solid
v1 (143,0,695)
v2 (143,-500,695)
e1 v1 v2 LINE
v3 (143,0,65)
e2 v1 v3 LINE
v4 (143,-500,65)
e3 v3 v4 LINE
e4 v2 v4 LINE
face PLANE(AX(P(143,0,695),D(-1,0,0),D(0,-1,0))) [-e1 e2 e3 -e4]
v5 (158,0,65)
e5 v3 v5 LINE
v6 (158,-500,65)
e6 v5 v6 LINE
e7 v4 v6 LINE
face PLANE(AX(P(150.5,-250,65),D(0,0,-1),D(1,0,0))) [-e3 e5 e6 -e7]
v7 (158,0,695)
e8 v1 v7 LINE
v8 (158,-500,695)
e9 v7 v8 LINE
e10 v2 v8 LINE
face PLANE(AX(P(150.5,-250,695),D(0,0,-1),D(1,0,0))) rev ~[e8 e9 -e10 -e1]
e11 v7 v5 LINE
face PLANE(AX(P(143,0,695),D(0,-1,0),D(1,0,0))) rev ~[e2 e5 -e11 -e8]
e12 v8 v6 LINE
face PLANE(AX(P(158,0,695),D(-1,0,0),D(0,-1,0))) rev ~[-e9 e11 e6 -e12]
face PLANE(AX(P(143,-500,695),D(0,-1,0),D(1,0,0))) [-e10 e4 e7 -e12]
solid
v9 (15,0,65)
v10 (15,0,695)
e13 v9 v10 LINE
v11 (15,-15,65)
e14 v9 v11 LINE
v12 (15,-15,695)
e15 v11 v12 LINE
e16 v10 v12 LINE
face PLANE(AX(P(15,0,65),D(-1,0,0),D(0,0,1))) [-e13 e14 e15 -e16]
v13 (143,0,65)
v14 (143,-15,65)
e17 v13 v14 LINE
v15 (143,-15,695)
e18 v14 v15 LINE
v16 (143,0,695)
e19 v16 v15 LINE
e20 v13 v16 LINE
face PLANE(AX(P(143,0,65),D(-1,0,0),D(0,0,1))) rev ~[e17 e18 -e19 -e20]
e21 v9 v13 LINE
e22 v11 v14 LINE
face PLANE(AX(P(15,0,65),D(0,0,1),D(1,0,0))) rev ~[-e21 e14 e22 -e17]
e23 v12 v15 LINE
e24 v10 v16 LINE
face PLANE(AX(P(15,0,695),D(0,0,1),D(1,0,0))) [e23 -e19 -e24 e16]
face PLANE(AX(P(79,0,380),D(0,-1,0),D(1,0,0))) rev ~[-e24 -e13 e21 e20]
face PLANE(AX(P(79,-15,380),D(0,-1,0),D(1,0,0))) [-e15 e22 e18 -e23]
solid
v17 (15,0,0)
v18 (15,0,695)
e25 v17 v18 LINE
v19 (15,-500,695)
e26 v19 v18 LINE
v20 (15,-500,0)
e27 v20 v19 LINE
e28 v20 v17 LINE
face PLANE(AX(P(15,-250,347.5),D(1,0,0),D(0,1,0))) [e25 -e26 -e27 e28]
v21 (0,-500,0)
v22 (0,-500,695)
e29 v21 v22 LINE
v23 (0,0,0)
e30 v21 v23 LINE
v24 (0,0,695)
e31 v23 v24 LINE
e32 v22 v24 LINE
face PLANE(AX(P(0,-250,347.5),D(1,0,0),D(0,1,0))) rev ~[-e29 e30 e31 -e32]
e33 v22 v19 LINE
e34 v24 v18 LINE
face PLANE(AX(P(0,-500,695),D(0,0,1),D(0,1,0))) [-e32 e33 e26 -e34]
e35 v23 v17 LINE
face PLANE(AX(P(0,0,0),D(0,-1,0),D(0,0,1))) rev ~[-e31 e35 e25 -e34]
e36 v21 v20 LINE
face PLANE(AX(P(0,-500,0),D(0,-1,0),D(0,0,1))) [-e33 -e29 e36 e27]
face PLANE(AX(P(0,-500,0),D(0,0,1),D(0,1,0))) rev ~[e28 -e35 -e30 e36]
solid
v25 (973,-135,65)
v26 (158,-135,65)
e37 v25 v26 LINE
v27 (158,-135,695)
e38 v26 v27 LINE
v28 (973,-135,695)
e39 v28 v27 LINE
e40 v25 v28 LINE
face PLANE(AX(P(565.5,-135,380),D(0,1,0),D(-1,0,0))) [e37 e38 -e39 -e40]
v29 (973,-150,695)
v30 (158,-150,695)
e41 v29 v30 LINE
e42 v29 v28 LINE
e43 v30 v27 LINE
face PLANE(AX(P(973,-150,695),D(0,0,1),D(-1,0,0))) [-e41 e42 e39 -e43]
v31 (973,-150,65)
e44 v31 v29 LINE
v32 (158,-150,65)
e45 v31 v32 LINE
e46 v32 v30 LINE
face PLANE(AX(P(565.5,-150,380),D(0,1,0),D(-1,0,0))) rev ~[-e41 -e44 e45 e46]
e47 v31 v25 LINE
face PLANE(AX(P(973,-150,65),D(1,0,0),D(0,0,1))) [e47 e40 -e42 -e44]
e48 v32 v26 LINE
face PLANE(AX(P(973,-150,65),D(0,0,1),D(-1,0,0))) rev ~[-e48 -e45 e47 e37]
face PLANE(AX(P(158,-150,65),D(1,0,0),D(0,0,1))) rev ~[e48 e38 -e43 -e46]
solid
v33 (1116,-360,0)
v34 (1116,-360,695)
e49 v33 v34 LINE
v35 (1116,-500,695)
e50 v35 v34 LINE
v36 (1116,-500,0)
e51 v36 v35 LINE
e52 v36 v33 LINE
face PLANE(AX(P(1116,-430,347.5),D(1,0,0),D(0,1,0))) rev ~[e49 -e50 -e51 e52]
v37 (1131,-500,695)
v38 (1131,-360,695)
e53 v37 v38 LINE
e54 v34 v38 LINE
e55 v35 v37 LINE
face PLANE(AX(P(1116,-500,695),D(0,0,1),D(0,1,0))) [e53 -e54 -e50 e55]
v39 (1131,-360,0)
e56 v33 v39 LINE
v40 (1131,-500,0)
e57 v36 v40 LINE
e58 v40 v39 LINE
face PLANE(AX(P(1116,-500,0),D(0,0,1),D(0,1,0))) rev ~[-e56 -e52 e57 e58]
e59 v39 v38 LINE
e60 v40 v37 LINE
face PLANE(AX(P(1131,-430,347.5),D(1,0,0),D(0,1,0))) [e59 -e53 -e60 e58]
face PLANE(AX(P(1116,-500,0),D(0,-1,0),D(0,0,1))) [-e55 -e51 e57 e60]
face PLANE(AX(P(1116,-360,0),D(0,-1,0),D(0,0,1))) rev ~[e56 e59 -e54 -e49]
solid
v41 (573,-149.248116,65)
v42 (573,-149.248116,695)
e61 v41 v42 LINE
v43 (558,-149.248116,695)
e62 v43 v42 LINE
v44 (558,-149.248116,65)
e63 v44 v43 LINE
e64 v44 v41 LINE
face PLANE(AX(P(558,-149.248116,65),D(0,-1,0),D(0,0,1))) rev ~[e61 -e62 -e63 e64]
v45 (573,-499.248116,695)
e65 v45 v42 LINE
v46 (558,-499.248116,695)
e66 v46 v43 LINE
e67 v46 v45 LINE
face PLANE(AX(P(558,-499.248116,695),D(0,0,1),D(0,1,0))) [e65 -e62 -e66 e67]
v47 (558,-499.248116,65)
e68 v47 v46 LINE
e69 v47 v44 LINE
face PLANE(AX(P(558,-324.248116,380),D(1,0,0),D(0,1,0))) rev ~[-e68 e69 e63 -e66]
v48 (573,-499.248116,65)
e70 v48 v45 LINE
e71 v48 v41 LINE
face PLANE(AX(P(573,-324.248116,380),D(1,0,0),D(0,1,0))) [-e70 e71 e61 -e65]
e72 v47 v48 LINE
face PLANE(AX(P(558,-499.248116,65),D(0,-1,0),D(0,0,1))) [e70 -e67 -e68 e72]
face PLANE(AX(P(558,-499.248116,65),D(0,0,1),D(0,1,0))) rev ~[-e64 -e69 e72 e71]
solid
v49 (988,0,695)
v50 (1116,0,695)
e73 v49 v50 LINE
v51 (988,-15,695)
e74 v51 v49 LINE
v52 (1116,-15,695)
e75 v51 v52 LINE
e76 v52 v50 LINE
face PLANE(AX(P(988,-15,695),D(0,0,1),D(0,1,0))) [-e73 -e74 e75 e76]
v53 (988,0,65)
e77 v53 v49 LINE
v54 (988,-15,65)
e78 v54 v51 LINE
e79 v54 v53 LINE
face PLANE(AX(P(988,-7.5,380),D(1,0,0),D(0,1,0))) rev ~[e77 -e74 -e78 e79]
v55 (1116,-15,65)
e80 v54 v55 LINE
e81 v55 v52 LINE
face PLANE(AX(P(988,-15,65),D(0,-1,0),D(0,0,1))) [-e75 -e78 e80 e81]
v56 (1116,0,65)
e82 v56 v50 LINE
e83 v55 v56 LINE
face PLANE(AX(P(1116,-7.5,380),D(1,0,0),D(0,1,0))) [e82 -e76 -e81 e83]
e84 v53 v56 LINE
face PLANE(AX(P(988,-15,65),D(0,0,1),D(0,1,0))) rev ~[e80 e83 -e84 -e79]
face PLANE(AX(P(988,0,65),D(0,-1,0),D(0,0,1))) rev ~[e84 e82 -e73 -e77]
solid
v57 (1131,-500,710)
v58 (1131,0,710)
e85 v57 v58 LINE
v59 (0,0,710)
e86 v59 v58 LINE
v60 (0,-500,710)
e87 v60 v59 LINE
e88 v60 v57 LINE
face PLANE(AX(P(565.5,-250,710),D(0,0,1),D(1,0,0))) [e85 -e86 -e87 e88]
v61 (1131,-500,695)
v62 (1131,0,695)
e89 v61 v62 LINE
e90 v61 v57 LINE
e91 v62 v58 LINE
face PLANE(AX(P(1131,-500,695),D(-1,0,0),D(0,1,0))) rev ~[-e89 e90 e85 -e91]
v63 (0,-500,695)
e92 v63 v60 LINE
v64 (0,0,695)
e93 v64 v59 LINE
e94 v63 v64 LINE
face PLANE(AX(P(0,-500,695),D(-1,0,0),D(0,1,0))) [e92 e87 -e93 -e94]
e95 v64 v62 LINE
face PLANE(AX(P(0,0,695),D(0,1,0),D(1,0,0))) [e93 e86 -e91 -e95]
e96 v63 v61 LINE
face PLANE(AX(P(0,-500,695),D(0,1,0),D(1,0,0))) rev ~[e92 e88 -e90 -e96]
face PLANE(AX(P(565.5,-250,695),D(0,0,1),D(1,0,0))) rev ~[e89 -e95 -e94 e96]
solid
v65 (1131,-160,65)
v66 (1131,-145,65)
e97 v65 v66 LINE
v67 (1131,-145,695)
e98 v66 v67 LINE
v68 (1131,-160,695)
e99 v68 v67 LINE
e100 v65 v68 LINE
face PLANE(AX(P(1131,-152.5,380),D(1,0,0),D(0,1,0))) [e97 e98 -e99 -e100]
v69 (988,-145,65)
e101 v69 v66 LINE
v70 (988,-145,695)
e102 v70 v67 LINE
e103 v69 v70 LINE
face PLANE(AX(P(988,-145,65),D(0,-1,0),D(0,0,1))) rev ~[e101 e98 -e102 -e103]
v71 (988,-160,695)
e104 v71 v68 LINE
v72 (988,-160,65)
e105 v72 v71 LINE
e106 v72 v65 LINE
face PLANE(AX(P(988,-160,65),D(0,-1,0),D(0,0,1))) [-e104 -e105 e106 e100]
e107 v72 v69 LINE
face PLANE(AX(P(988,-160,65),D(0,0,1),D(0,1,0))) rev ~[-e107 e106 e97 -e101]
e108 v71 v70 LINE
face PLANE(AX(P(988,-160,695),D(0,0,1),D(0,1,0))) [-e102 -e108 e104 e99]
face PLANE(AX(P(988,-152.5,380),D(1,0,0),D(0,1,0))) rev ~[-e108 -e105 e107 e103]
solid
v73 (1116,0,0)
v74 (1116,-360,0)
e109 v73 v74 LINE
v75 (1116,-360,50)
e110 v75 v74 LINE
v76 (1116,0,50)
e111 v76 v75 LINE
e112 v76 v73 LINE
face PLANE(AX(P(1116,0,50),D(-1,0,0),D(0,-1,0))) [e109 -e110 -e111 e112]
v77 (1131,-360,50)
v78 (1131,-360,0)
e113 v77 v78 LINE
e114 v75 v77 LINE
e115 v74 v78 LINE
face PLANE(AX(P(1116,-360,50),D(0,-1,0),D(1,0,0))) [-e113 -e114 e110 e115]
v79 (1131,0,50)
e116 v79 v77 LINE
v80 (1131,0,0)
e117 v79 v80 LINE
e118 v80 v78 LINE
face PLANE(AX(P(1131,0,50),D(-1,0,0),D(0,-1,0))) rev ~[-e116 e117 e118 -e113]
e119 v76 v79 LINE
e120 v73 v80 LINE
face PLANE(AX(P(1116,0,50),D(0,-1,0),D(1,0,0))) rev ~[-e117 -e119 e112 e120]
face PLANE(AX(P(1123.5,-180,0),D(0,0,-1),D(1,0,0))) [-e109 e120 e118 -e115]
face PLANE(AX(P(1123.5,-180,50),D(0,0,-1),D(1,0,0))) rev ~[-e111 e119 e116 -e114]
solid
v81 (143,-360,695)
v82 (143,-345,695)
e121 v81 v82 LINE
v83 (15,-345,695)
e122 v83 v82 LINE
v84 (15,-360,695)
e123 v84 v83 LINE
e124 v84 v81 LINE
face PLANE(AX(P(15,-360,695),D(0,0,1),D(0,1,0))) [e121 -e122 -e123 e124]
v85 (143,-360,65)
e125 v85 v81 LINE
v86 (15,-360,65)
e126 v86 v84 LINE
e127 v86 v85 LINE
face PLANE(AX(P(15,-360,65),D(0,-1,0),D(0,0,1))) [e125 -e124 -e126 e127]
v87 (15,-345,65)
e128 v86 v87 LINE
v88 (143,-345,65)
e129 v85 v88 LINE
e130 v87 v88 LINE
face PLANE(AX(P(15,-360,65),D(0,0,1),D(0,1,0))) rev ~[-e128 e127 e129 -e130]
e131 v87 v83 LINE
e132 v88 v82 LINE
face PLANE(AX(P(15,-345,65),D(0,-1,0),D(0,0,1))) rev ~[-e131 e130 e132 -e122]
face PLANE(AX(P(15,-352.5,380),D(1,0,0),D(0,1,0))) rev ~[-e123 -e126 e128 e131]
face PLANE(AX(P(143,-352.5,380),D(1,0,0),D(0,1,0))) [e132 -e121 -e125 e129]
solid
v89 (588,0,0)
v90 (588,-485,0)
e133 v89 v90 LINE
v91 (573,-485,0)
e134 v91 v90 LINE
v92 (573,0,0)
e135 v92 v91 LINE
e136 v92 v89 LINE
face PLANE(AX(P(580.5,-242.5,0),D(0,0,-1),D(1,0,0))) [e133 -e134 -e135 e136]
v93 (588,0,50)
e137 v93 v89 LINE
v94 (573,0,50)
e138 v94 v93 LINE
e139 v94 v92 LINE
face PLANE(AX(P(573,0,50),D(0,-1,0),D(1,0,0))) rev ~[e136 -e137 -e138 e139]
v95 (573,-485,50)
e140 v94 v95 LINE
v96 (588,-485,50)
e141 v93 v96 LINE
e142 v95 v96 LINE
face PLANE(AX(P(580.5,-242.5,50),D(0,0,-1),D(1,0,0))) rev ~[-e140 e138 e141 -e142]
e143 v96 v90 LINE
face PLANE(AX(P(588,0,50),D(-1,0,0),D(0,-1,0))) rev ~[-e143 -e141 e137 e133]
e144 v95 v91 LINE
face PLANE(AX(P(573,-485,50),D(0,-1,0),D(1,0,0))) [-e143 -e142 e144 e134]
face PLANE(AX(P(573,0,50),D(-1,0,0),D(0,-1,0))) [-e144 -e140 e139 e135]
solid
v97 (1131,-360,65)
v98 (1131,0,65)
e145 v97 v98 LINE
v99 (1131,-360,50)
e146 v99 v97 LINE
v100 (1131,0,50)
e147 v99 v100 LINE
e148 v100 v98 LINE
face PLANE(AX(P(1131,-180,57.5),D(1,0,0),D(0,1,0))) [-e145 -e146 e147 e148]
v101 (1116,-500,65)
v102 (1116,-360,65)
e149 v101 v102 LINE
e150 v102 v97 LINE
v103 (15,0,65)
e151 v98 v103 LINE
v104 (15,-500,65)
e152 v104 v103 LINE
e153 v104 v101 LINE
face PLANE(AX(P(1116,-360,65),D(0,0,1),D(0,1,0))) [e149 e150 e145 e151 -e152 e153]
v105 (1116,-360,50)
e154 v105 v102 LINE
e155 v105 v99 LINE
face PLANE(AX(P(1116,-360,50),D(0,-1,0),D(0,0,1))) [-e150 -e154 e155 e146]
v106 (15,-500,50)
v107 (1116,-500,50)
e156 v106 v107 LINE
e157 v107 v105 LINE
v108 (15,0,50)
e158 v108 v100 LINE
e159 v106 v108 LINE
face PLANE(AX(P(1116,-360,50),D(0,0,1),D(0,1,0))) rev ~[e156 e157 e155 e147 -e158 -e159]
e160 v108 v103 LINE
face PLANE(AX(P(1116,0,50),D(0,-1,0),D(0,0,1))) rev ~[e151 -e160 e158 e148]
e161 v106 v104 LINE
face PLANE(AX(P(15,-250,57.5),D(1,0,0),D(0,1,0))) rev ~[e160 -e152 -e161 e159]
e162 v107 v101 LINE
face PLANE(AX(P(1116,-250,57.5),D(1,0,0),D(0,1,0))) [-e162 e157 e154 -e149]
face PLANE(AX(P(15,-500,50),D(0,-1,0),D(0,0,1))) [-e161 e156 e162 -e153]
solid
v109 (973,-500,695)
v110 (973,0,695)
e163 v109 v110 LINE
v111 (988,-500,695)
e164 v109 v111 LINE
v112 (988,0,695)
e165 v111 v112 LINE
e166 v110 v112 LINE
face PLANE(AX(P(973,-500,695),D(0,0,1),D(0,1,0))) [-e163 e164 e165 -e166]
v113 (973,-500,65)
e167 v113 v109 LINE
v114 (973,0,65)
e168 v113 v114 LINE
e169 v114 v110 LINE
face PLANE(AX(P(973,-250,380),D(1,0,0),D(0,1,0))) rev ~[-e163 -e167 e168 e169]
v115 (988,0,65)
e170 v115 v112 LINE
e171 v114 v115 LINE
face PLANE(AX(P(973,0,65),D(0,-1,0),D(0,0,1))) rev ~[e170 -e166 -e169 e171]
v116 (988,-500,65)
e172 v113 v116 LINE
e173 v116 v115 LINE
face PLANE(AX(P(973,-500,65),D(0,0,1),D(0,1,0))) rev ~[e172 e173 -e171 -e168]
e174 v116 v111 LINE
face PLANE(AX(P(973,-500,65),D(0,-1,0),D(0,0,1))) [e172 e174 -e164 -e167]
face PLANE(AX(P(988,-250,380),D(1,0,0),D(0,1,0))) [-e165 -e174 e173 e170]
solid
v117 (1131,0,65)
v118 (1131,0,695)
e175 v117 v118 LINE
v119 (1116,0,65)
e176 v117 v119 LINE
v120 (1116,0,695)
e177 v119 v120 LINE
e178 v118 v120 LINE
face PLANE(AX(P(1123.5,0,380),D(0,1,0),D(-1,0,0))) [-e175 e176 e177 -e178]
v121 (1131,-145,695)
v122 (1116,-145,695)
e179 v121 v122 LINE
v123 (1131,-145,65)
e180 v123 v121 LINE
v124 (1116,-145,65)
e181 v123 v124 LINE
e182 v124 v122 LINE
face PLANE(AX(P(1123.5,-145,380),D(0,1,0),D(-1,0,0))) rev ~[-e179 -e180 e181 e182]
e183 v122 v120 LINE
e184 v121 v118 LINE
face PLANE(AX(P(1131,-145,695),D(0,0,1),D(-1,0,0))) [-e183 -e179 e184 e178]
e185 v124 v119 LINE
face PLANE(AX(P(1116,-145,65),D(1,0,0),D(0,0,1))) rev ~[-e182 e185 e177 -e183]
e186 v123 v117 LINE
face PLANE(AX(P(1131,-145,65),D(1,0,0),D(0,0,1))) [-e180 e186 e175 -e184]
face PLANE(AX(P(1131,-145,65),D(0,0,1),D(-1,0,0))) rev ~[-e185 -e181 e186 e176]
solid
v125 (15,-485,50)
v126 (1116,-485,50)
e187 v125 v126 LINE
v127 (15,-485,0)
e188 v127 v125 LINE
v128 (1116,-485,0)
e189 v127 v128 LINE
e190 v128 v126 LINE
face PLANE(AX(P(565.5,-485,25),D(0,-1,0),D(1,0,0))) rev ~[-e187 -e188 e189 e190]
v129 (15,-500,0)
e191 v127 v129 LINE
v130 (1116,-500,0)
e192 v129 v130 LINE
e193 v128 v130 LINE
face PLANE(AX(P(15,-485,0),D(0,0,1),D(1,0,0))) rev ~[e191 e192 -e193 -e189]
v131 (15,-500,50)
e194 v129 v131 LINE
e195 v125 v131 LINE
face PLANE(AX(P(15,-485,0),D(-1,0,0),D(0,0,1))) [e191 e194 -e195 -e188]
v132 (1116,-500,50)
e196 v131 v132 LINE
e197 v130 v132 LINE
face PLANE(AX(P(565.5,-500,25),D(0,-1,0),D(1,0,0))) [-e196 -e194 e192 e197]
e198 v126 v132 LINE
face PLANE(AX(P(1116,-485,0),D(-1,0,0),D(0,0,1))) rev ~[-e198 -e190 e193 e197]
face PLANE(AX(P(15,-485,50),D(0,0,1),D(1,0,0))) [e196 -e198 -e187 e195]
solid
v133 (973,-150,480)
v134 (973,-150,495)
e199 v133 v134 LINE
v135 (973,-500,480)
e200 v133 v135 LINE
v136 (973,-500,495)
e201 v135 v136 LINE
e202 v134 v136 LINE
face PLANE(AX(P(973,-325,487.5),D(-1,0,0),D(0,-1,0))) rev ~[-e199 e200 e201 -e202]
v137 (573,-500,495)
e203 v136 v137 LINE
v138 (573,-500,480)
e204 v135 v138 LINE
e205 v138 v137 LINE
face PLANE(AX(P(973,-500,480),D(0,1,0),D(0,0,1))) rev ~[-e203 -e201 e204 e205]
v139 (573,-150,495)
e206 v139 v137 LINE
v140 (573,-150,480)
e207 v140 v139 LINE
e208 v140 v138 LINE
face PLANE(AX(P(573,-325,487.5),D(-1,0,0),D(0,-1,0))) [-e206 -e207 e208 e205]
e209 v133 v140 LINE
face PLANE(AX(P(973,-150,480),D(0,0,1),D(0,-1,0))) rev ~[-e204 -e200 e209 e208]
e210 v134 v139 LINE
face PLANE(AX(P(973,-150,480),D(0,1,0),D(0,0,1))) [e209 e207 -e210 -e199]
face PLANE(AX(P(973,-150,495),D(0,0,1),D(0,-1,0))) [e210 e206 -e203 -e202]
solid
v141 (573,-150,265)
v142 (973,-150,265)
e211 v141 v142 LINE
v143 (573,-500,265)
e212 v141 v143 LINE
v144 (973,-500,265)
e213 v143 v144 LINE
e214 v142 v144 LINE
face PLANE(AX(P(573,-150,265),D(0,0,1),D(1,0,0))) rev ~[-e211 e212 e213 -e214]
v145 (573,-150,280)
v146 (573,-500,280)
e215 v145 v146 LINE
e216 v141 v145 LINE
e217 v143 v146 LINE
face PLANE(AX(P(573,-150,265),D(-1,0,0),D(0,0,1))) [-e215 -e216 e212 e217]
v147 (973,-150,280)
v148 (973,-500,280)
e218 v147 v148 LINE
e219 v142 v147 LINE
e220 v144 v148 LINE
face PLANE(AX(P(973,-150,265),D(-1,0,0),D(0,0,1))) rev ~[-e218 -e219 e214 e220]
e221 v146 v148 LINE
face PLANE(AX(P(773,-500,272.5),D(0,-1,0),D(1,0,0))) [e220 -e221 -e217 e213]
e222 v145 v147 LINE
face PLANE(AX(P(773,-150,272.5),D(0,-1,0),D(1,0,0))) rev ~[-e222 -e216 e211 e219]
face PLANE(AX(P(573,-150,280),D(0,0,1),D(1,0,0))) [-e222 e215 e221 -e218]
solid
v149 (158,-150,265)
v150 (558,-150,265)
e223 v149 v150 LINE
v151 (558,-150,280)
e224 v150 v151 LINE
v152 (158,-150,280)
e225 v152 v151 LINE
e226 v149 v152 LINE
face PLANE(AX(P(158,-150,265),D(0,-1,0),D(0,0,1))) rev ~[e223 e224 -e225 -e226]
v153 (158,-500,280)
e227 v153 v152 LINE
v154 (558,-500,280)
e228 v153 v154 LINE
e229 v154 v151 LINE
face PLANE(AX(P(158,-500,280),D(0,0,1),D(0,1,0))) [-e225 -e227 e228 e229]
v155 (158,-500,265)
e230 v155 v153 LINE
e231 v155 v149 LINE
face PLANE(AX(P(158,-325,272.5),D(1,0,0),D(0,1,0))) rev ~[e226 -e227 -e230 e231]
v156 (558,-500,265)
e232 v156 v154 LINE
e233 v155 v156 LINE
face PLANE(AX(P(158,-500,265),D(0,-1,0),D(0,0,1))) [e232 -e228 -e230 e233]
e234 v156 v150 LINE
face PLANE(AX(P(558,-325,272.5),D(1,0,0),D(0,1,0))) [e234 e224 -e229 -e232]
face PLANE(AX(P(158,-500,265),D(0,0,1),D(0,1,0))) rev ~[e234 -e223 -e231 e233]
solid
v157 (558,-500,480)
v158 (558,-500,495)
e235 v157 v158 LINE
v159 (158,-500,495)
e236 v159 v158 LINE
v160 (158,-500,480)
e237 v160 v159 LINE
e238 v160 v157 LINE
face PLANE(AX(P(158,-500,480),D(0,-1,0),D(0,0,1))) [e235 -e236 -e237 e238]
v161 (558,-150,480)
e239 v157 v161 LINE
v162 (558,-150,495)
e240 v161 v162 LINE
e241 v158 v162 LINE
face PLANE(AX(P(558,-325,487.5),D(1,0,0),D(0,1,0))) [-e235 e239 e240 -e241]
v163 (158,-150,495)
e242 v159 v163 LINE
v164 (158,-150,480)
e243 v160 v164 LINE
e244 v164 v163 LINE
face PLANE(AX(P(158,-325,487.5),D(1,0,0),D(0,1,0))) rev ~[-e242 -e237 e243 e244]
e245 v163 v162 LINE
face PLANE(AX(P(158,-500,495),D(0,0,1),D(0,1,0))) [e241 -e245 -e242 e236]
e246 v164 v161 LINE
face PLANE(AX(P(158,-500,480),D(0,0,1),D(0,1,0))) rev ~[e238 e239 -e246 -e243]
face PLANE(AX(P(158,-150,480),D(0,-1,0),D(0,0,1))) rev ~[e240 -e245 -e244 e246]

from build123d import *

# Parameters (mm, degrees)
F0_W      = 500
F0_H      = 695
F1_DEPTH  = 15
F2_W      = 1131
F2_H      = 500
F3_DEPTH  = 15
F4_W      = 500
F4_H      = 15
F5_DEPTH  = 1101
F6_W      = 15
F6_H      = 485
F7_DEPTH  = 50
F8_W      = 1101
F8_H      = 50
F9_DEPTH  = 15
F10_W     = 140
F10_H     = 695
F11_DEPTH = 15
F12_W     = 360
F12_H     = 15
F13_DEPTH = 15
F14_W     = 15
F14_H     = 360
F15_DEPTH = 50
F16_W     = 15
F16_H     = 500
F17_DEPTH = 630
F18_W     = 350
F18_H     = 15
F19_DEPTH = 400
F20_W     = 350
F20_H     = 15
F21_DEPTH = 400
F22_W     = 815
F22_H     = 630
F23_DEPTH = 15
F24_W     = 500
F24_H     = 630
F25_DEPTH = 15
F26_W     = 400
F26_H     = 15
F27_DEPTH = 350
F29_W     = 350
F29_H     = 15
F30_DEPTH = 400
F31_W     = 350
F31_H     = 630
F32_DEPTH = 15
F33_W     = 15
F33_H     = 630
F34_DEPTH = 143
F35_W     = 128
F35_H     = 630
F36_DEPTH = 15
F37_W     = 15
F37_H     = 630
F38_DEPTH = 128
F39_W     = 15
F39_H     = 630
F40_DEPTH = 128
F41_W     = 15
F41_H     = 630
F42_DEPTH = 145


with BuildPart() as f1:
    # F0 (on Right) → F1 (new body)
    with BuildSketch(Plane.YZ):
        with Locations((-250, 347.5)):
            Rectangle(F0_W, F0_H)
    extrude(amount=F1_DEPTH)


with BuildPart() as f3:
    # F2 (on face) → F3 (new body)
    with BuildSketch(Plane.XY.offset(695)):
        with Locations((565.5, -250)):
            Rectangle(F2_W, F2_H)
    extrude(amount=F3_DEPTH)


with BuildPart() as f5:
    # F4 (on face) → F5 (new body)
    with BuildSketch(Plane.YZ.offset(15)):
        with Locations((-250, 57.5)):
            Rectangle(F4_W, F4_H)
    extrude(amount=F5_DEPTH)

    # F12 (on face) → F13 (join)
    with BuildSketch(Plane.YZ.offset(1116)):
        with Locations((-180, 57.5)):
            Rectangle(F12_W, F12_H)
    extrude(amount=F13_DEPTH)


with BuildPart() as f7:
    # F6 (on face) → F7 (new body)
    with BuildSketch(Plane(origin=(0, 0, 50), x_dir=(1, 0, 0), z_dir=(0, 0, -1))):
        with Locations((580.5, 242.5)):
            Rectangle(F6_W, F6_H)
    extrude(amount=F7_DEPTH)


with BuildPart() as f9:
    # F8 (on face) → F9 (new body)
    with BuildSketch(Plane.XZ.offset(485)):
        with Locations((565.5, 25)):
            Rectangle(F8_W, F8_H)
    extrude(amount=F9_DEPTH)


with BuildPart() as f11:
    # F10 (on face) → F11 (new body)
    with BuildSketch(Plane.YZ.offset(1116)):
        with Locations((-430, 347.5)):
            Rectangle(F10_W, F10_H)
    extrude(amount=F11_DEPTH)


with BuildPart() as f15:
    # F14 (on face) → F15 (new body)
    with BuildSketch(Plane(origin=(0, 0, 50), x_dir=(1, 0, 0), z_dir=(0, 0, -1))):
        with Locations((1123.5, 180)):
            Rectangle(F14_W, F14_H)
    extrude(amount=F15_DEPTH)


with BuildPart() as f17:
    # F16 (on face) → F17 (new body)
    with BuildSketch(Plane(origin=(0, 0, 695), x_dir=(1, 0, 0), z_dir=(0, 0, -1))):
        with Locations((150.5, 250)):
            Rectangle(F16_W, F16_H)
    extrude(amount=F17_DEPTH)


with BuildPart() as f19:
    # F18 (on face) → F19 (new body)
    with BuildSketch(Plane.YZ.offset(158)):
        with Locations((-325, 487.5)):
            Rectangle(F18_W, F18_H)
    extrude(amount=F19_DEPTH)


with BuildPart() as f21:
    # F20 (on face) → F21 (new body)
    with BuildSketch(Plane.YZ.offset(158)):
        with Locations((-325, 272.5)):
            Rectangle(F20_W, F20_H)
    extrude(amount=F21_DEPTH)


with BuildPart() as f23:
    # F22 (on face) → F23 (new body)
    with BuildSketch(Plane(origin=(0, -150, 0), x_dir=(-1, 0, 0), z_dir=(0, 1, 0))):
        with Locations((-565.5, 380)):
            Rectangle(F22_W, F22_H)
    extrude(amount=F23_DEPTH)


with BuildPart() as f25:
    # F24 (on face) → F25 (new body)
    with BuildSketch(Plane.YZ.offset(973)):
        with Locations((-250, 380)):
            Rectangle(F24_W, F24_H)
    extrude(amount=F25_DEPTH)


with BuildPart() as f27:
    # F26 (on face) → F27 (new body)
    with BuildSketch(Plane.XZ.offset(150)):
        with Locations((773, 272.5)):
            Rectangle(F26_W, F26_H)
    extrude(amount=F27_DEPTH)


with BuildPart() as f30:
    # F29 (on face) → F30 (new body)
    with BuildSketch(Plane(origin=(973, 0, 0), x_dir=(0, -1, 0), z_dir=(-1, 0, 0))):
        with Locations((325, 487.5)):
            Rectangle(F29_W, F29_H)
    extrude(amount=F30_DEPTH)


with BuildPart() as f32:
    # F31 (on face) → F32 (new body)
    with BuildSketch(Plane.YZ.offset(558)):
        with Locations((-324.248115566, 380)):
            Rectangle(F31_W, F31_H)
    extrude(amount=F32_DEPTH)


with BuildPart() as f34:
    # F33 (on face) → F34 (new body)
    with BuildSketch(Plane.YZ.offset(988)):
        with Locations((-152.5, 380)):
            Rectangle(F33_W, F33_H)
    extrude(amount=F34_DEPTH)


with BuildPart() as f36:
    # F35 (on Front) → F36 (new body)
    with BuildSketch(Plane.XZ):
        with Locations((79, 380)):
            Rectangle(F35_W, F35_H)
    extrude(amount=F36_DEPTH)


with BuildPart() as f38:
    # F37 (on face) → F38 (new body)
    with BuildSketch(Plane.YZ.offset(15)):
        with Locations((-352.5, 380)):
            Rectangle(F37_W, F37_H)
    extrude(amount=F38_DEPTH)


with BuildPart() as f40:
    # F39 (on face) → F40 (new body)
    with BuildSketch(Plane.YZ.offset(988)):
        with Locations((-7.5, 380)):
            Rectangle(F39_W, F39_H)
    extrude(amount=F40_DEPTH)


with BuildPart() as f42:
    # F41 (on face) → F42 (new body)
    with BuildSketch(Plane(origin=(0, -145, 0), x_dir=(-1, 0, 0), z_dir=(0, 1, 0))):
        with Locations((-1123.5, 380)):
            Rectangle(F41_W, F41_H)
    extrude(amount=F42_DEPTH)


solid = Compound([f1.part, f3.part, f5.part, f7.part, f9.part, f11.part, f15.part, f17.part, f19.part, f21.part, f23.part, f25.part, f27.part, f30.part, f32.part, f34.part, f36.part, f38.part, f40.part, f42.part])
